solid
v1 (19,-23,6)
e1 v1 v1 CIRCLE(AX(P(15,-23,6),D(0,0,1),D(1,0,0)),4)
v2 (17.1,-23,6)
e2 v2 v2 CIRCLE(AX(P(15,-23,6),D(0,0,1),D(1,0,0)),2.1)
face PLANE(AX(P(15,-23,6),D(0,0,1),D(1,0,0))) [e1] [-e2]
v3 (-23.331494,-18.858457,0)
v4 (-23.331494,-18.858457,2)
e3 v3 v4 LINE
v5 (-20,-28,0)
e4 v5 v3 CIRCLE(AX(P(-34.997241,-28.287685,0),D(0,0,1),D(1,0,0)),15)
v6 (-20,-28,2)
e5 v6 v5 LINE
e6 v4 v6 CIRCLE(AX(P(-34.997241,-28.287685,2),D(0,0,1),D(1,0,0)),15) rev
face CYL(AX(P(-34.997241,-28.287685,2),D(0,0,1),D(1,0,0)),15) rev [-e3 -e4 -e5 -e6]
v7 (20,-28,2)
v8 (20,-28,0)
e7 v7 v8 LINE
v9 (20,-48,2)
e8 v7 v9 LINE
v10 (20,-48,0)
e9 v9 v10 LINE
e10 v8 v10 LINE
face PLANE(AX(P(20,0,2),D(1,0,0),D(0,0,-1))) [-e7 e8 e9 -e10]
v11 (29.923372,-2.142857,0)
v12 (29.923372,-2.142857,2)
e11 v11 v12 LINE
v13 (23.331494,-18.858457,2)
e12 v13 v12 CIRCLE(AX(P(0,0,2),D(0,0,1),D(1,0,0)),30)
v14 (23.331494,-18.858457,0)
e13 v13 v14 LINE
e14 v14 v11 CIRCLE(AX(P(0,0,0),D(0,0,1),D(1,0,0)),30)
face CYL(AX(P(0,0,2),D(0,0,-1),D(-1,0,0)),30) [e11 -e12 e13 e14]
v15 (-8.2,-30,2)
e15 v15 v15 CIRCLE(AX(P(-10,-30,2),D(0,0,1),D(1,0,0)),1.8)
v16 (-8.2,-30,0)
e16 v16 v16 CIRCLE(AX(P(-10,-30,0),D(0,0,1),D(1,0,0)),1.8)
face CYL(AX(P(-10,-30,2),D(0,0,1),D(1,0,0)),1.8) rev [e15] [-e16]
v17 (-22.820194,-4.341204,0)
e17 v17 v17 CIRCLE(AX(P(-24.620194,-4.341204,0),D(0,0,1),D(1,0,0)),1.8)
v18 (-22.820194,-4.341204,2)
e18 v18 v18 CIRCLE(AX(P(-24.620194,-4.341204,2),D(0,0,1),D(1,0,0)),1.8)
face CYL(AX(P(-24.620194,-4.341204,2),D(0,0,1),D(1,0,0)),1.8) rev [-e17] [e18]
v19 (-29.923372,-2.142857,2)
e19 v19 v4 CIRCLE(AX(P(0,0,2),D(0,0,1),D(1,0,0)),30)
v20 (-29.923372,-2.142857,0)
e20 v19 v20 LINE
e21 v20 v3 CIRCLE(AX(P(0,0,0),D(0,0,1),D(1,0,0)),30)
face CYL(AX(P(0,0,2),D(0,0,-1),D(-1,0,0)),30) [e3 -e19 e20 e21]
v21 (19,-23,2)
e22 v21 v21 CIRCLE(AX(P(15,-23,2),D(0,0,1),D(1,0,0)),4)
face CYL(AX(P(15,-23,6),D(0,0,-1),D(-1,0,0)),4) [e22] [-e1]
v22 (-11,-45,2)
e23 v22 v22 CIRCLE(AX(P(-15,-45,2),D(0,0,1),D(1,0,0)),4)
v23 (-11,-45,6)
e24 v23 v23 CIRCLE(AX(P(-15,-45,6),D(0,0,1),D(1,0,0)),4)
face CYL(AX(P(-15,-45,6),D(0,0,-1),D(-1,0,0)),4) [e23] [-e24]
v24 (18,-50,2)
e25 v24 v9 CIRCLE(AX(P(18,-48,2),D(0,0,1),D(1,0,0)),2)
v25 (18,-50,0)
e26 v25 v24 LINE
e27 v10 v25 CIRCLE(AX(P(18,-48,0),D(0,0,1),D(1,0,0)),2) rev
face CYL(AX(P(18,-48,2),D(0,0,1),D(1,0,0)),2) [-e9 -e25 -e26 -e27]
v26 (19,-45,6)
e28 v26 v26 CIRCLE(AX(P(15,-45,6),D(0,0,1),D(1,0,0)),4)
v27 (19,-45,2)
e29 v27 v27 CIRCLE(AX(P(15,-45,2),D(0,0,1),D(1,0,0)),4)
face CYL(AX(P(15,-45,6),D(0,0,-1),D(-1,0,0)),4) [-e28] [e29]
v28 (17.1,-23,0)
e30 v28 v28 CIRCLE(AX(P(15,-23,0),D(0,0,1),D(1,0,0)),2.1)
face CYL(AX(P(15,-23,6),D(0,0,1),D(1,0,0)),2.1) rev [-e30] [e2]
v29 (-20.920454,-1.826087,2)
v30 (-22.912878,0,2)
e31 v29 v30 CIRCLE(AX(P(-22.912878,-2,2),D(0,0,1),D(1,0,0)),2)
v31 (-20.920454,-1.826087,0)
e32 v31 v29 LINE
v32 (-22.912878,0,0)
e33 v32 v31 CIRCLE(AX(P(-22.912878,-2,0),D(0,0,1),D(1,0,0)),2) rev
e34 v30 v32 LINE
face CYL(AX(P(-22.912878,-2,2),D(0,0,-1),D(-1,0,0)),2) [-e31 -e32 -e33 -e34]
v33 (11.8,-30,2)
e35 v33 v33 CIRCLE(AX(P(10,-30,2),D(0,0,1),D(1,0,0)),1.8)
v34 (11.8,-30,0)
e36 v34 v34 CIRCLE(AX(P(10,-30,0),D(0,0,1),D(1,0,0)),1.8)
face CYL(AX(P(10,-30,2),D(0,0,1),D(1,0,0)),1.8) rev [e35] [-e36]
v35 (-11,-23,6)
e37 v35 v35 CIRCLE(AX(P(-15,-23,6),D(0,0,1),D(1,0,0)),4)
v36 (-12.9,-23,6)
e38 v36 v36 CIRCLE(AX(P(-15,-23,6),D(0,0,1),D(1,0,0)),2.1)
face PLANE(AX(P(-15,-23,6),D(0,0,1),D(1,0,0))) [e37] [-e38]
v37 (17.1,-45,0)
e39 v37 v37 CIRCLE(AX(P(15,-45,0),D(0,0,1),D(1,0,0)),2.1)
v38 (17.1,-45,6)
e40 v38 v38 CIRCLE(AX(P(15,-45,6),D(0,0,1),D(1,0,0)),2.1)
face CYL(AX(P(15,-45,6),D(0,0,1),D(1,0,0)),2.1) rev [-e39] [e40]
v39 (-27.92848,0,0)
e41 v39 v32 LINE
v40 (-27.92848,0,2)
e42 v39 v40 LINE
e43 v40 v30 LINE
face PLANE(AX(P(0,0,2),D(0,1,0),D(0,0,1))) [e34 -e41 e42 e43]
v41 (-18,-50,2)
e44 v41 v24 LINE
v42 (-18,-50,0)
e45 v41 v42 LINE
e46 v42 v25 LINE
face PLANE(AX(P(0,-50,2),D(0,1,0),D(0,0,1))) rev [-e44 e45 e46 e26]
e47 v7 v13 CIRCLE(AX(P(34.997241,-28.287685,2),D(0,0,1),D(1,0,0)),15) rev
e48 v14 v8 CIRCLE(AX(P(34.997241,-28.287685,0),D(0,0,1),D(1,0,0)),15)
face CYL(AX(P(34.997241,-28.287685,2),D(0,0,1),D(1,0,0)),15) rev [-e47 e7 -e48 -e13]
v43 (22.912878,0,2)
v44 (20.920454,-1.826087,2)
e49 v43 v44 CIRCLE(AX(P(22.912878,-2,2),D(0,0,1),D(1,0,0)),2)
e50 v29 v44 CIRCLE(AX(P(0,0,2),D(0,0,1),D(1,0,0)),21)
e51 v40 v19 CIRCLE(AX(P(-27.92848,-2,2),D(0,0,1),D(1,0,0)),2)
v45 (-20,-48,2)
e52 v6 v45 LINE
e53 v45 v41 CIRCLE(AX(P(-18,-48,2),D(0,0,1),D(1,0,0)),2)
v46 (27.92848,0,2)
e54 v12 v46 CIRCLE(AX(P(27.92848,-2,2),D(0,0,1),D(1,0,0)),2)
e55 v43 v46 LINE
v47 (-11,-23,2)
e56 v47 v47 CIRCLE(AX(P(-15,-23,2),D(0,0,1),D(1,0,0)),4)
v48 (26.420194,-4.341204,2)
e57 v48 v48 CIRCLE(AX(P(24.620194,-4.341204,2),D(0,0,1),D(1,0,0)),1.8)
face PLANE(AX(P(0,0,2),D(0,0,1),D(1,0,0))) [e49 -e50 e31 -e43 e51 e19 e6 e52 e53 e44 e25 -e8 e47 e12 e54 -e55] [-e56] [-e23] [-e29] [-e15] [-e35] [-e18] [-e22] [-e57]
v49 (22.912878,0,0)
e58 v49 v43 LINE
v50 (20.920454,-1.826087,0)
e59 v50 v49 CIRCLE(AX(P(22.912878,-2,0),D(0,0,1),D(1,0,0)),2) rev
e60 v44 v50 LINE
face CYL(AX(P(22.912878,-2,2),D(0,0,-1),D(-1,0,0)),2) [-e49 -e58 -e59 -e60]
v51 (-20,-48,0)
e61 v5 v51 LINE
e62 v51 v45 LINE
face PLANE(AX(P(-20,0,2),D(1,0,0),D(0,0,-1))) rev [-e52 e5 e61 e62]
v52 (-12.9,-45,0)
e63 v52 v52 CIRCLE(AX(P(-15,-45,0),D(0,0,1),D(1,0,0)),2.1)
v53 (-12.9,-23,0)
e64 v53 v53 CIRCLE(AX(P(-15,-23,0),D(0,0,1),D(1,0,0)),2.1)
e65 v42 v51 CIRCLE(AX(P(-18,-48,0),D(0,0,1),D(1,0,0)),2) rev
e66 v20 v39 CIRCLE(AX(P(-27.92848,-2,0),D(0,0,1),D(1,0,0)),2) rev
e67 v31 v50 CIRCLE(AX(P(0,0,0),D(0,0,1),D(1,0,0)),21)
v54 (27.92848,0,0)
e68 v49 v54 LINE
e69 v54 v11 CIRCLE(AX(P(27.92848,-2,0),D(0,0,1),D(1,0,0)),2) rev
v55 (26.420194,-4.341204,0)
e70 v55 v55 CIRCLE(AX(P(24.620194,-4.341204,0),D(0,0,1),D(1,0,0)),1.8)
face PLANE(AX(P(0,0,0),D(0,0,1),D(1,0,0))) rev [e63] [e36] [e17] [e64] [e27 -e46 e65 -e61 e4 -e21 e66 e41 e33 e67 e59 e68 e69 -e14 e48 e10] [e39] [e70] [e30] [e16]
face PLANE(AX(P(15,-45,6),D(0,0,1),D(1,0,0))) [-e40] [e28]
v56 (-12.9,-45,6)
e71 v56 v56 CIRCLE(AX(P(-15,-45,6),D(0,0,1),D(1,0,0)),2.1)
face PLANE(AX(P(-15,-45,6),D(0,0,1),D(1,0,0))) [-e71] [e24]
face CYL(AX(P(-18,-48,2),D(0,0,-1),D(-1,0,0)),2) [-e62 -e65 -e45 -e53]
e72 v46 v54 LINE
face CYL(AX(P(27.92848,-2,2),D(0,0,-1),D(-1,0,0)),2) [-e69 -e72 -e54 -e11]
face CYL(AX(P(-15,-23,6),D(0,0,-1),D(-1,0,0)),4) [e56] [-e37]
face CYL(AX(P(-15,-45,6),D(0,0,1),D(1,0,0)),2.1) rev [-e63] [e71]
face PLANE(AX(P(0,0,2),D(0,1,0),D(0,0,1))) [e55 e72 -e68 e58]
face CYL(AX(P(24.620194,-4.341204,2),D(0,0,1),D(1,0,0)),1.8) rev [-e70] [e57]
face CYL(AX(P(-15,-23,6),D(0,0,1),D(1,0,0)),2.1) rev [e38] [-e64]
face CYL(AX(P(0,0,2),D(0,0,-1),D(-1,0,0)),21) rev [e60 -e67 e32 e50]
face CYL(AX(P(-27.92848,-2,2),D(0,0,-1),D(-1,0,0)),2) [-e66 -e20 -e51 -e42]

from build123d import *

# Parameters (mm, degrees)
BOSS_EXTRUDE1_DEPTH        = 2
FILLET1_R                  = 15
FILLET3_R                  = 2
M3_CLEARANCE_HOLE1_D       = 3.6
SKETCH7_R                  = 4
BOSS_EXTRUDE2_DEPTH        = 4
F_4_2_4_2_DIAMETER_HOLE1_D = 4.2


with BuildPart() as part:
    # Sketch1 → Boss-Extrude1 (new body)
    with BuildSketch(Plane.XY):
        with BuildLine():
            Line((-10.770329614, -28), (-20, -28))
            Line((-20, -28), (-20, -50))
            Line((-20, -50), (20, -50))
            Line((20, -50), (20, -28))
            Line((20, -28), (10.770329614, -28))
            ThreePointArc((10.770329614, -28), (24.729636961, -16.983670268), (30, 0))
            Line((30, 0), (21, 0))
            ThreePointArc((21, 0), (0, -21), (-21, 0))
            Line((-21, 0), (-30, 0))
            ThreePointArc((-30, 0), (-24.729636961, -16.983670268), (-10.770329614, -28))
        make_face()
    extrude(amount=BOSS_EXTRUDE1_DEPTH)

    # Fillet1
    # the kernel refuses this fillet: 15 mm, written as the material it adds along each edge
    with BuildSketch(Plane(origin=(-10.770329614, -28, 0), x_dir=(-0.8085477056225583, 0.588430631198357, 0), z_dir=(0, 0, 1))) as fillet1_piece_1:
        with BuildLine():
            CenterArc((19.419330938, 14.488463805), FILLET1_R, 217.144663105, 37.84908673)
            Line((7.462628814, 5.431020771), (0, 0))
            ThreePointArc((0, 0), (7.767732375, 1.023072389), (15.53546475, 0))
        make_face()
    extrude(amount=2)
    with BuildSketch(Plane(origin=(10.770329614, -28, 0), x_dir=(0.8085477056225584, 0.5884306311983569, 0), z_dir=(0, 0, 1))) as fillet1_piece_2:
        with BuildLine():
            CenterArc((19.419330938, -14.488463805), FILLET1_R, 105.006250165, 37.84908673)
            Line((7.462628814, -5.431020771), (0, 0))
            ThreePointArc((0, 0), (7.767732375, -1.023072389), (15.53546475, 0))
        make_face()
    extrude(amount=2)

    # Fillet3
    fillet3_edges = [part.edges().sort_by_distance(p)[0] for p in [
        (20, -50, 1),
        (-20, -50, 1),
        (-30, 0, 1),
        (-21, 0, 1),
        (21, 0, 1),
        (30, 0, 1),
    ]]
    fillet(fillet3_edges, radius=FILLET3_R)

    # M3 Clearance Hole1 (through all)
    with Locations(Plane.XY.offset(2)):
        with Locations((10, -30), (-24.620193825, -4.341204442), (-10, -30), (24.620193825, -4.341204442)):
            Hole(M3_CLEARANCE_HOLE1_D / 2)

    # Sketch7 → Boss-Extrude2 (add)
    with BuildSketch(Plane.XY.offset(2)):
        with Locations((-15, -45)):
            Circle(SKETCH7_R)
        with Locations((15, -45)):
            Circle(SKETCH7_R)
        with Locations((15, -23)):
            Circle(SKETCH7_R)
        with Locations((-15, -23)):
            Circle(SKETCH7_R)
    extrude(amount=BOSS_EXTRUDE2_DEPTH)

    # Ø4.2 (4.2) Diameter Hole1 (through all)
    with Locations(Plane.XY.offset(6)):
        with Locations((-15, -23), (15, -23), (15, -45), (-15, -45)):
            Hole(F_4_2_4_2_DIAMETER_HOLE1_D / 2)


solid = part.part
